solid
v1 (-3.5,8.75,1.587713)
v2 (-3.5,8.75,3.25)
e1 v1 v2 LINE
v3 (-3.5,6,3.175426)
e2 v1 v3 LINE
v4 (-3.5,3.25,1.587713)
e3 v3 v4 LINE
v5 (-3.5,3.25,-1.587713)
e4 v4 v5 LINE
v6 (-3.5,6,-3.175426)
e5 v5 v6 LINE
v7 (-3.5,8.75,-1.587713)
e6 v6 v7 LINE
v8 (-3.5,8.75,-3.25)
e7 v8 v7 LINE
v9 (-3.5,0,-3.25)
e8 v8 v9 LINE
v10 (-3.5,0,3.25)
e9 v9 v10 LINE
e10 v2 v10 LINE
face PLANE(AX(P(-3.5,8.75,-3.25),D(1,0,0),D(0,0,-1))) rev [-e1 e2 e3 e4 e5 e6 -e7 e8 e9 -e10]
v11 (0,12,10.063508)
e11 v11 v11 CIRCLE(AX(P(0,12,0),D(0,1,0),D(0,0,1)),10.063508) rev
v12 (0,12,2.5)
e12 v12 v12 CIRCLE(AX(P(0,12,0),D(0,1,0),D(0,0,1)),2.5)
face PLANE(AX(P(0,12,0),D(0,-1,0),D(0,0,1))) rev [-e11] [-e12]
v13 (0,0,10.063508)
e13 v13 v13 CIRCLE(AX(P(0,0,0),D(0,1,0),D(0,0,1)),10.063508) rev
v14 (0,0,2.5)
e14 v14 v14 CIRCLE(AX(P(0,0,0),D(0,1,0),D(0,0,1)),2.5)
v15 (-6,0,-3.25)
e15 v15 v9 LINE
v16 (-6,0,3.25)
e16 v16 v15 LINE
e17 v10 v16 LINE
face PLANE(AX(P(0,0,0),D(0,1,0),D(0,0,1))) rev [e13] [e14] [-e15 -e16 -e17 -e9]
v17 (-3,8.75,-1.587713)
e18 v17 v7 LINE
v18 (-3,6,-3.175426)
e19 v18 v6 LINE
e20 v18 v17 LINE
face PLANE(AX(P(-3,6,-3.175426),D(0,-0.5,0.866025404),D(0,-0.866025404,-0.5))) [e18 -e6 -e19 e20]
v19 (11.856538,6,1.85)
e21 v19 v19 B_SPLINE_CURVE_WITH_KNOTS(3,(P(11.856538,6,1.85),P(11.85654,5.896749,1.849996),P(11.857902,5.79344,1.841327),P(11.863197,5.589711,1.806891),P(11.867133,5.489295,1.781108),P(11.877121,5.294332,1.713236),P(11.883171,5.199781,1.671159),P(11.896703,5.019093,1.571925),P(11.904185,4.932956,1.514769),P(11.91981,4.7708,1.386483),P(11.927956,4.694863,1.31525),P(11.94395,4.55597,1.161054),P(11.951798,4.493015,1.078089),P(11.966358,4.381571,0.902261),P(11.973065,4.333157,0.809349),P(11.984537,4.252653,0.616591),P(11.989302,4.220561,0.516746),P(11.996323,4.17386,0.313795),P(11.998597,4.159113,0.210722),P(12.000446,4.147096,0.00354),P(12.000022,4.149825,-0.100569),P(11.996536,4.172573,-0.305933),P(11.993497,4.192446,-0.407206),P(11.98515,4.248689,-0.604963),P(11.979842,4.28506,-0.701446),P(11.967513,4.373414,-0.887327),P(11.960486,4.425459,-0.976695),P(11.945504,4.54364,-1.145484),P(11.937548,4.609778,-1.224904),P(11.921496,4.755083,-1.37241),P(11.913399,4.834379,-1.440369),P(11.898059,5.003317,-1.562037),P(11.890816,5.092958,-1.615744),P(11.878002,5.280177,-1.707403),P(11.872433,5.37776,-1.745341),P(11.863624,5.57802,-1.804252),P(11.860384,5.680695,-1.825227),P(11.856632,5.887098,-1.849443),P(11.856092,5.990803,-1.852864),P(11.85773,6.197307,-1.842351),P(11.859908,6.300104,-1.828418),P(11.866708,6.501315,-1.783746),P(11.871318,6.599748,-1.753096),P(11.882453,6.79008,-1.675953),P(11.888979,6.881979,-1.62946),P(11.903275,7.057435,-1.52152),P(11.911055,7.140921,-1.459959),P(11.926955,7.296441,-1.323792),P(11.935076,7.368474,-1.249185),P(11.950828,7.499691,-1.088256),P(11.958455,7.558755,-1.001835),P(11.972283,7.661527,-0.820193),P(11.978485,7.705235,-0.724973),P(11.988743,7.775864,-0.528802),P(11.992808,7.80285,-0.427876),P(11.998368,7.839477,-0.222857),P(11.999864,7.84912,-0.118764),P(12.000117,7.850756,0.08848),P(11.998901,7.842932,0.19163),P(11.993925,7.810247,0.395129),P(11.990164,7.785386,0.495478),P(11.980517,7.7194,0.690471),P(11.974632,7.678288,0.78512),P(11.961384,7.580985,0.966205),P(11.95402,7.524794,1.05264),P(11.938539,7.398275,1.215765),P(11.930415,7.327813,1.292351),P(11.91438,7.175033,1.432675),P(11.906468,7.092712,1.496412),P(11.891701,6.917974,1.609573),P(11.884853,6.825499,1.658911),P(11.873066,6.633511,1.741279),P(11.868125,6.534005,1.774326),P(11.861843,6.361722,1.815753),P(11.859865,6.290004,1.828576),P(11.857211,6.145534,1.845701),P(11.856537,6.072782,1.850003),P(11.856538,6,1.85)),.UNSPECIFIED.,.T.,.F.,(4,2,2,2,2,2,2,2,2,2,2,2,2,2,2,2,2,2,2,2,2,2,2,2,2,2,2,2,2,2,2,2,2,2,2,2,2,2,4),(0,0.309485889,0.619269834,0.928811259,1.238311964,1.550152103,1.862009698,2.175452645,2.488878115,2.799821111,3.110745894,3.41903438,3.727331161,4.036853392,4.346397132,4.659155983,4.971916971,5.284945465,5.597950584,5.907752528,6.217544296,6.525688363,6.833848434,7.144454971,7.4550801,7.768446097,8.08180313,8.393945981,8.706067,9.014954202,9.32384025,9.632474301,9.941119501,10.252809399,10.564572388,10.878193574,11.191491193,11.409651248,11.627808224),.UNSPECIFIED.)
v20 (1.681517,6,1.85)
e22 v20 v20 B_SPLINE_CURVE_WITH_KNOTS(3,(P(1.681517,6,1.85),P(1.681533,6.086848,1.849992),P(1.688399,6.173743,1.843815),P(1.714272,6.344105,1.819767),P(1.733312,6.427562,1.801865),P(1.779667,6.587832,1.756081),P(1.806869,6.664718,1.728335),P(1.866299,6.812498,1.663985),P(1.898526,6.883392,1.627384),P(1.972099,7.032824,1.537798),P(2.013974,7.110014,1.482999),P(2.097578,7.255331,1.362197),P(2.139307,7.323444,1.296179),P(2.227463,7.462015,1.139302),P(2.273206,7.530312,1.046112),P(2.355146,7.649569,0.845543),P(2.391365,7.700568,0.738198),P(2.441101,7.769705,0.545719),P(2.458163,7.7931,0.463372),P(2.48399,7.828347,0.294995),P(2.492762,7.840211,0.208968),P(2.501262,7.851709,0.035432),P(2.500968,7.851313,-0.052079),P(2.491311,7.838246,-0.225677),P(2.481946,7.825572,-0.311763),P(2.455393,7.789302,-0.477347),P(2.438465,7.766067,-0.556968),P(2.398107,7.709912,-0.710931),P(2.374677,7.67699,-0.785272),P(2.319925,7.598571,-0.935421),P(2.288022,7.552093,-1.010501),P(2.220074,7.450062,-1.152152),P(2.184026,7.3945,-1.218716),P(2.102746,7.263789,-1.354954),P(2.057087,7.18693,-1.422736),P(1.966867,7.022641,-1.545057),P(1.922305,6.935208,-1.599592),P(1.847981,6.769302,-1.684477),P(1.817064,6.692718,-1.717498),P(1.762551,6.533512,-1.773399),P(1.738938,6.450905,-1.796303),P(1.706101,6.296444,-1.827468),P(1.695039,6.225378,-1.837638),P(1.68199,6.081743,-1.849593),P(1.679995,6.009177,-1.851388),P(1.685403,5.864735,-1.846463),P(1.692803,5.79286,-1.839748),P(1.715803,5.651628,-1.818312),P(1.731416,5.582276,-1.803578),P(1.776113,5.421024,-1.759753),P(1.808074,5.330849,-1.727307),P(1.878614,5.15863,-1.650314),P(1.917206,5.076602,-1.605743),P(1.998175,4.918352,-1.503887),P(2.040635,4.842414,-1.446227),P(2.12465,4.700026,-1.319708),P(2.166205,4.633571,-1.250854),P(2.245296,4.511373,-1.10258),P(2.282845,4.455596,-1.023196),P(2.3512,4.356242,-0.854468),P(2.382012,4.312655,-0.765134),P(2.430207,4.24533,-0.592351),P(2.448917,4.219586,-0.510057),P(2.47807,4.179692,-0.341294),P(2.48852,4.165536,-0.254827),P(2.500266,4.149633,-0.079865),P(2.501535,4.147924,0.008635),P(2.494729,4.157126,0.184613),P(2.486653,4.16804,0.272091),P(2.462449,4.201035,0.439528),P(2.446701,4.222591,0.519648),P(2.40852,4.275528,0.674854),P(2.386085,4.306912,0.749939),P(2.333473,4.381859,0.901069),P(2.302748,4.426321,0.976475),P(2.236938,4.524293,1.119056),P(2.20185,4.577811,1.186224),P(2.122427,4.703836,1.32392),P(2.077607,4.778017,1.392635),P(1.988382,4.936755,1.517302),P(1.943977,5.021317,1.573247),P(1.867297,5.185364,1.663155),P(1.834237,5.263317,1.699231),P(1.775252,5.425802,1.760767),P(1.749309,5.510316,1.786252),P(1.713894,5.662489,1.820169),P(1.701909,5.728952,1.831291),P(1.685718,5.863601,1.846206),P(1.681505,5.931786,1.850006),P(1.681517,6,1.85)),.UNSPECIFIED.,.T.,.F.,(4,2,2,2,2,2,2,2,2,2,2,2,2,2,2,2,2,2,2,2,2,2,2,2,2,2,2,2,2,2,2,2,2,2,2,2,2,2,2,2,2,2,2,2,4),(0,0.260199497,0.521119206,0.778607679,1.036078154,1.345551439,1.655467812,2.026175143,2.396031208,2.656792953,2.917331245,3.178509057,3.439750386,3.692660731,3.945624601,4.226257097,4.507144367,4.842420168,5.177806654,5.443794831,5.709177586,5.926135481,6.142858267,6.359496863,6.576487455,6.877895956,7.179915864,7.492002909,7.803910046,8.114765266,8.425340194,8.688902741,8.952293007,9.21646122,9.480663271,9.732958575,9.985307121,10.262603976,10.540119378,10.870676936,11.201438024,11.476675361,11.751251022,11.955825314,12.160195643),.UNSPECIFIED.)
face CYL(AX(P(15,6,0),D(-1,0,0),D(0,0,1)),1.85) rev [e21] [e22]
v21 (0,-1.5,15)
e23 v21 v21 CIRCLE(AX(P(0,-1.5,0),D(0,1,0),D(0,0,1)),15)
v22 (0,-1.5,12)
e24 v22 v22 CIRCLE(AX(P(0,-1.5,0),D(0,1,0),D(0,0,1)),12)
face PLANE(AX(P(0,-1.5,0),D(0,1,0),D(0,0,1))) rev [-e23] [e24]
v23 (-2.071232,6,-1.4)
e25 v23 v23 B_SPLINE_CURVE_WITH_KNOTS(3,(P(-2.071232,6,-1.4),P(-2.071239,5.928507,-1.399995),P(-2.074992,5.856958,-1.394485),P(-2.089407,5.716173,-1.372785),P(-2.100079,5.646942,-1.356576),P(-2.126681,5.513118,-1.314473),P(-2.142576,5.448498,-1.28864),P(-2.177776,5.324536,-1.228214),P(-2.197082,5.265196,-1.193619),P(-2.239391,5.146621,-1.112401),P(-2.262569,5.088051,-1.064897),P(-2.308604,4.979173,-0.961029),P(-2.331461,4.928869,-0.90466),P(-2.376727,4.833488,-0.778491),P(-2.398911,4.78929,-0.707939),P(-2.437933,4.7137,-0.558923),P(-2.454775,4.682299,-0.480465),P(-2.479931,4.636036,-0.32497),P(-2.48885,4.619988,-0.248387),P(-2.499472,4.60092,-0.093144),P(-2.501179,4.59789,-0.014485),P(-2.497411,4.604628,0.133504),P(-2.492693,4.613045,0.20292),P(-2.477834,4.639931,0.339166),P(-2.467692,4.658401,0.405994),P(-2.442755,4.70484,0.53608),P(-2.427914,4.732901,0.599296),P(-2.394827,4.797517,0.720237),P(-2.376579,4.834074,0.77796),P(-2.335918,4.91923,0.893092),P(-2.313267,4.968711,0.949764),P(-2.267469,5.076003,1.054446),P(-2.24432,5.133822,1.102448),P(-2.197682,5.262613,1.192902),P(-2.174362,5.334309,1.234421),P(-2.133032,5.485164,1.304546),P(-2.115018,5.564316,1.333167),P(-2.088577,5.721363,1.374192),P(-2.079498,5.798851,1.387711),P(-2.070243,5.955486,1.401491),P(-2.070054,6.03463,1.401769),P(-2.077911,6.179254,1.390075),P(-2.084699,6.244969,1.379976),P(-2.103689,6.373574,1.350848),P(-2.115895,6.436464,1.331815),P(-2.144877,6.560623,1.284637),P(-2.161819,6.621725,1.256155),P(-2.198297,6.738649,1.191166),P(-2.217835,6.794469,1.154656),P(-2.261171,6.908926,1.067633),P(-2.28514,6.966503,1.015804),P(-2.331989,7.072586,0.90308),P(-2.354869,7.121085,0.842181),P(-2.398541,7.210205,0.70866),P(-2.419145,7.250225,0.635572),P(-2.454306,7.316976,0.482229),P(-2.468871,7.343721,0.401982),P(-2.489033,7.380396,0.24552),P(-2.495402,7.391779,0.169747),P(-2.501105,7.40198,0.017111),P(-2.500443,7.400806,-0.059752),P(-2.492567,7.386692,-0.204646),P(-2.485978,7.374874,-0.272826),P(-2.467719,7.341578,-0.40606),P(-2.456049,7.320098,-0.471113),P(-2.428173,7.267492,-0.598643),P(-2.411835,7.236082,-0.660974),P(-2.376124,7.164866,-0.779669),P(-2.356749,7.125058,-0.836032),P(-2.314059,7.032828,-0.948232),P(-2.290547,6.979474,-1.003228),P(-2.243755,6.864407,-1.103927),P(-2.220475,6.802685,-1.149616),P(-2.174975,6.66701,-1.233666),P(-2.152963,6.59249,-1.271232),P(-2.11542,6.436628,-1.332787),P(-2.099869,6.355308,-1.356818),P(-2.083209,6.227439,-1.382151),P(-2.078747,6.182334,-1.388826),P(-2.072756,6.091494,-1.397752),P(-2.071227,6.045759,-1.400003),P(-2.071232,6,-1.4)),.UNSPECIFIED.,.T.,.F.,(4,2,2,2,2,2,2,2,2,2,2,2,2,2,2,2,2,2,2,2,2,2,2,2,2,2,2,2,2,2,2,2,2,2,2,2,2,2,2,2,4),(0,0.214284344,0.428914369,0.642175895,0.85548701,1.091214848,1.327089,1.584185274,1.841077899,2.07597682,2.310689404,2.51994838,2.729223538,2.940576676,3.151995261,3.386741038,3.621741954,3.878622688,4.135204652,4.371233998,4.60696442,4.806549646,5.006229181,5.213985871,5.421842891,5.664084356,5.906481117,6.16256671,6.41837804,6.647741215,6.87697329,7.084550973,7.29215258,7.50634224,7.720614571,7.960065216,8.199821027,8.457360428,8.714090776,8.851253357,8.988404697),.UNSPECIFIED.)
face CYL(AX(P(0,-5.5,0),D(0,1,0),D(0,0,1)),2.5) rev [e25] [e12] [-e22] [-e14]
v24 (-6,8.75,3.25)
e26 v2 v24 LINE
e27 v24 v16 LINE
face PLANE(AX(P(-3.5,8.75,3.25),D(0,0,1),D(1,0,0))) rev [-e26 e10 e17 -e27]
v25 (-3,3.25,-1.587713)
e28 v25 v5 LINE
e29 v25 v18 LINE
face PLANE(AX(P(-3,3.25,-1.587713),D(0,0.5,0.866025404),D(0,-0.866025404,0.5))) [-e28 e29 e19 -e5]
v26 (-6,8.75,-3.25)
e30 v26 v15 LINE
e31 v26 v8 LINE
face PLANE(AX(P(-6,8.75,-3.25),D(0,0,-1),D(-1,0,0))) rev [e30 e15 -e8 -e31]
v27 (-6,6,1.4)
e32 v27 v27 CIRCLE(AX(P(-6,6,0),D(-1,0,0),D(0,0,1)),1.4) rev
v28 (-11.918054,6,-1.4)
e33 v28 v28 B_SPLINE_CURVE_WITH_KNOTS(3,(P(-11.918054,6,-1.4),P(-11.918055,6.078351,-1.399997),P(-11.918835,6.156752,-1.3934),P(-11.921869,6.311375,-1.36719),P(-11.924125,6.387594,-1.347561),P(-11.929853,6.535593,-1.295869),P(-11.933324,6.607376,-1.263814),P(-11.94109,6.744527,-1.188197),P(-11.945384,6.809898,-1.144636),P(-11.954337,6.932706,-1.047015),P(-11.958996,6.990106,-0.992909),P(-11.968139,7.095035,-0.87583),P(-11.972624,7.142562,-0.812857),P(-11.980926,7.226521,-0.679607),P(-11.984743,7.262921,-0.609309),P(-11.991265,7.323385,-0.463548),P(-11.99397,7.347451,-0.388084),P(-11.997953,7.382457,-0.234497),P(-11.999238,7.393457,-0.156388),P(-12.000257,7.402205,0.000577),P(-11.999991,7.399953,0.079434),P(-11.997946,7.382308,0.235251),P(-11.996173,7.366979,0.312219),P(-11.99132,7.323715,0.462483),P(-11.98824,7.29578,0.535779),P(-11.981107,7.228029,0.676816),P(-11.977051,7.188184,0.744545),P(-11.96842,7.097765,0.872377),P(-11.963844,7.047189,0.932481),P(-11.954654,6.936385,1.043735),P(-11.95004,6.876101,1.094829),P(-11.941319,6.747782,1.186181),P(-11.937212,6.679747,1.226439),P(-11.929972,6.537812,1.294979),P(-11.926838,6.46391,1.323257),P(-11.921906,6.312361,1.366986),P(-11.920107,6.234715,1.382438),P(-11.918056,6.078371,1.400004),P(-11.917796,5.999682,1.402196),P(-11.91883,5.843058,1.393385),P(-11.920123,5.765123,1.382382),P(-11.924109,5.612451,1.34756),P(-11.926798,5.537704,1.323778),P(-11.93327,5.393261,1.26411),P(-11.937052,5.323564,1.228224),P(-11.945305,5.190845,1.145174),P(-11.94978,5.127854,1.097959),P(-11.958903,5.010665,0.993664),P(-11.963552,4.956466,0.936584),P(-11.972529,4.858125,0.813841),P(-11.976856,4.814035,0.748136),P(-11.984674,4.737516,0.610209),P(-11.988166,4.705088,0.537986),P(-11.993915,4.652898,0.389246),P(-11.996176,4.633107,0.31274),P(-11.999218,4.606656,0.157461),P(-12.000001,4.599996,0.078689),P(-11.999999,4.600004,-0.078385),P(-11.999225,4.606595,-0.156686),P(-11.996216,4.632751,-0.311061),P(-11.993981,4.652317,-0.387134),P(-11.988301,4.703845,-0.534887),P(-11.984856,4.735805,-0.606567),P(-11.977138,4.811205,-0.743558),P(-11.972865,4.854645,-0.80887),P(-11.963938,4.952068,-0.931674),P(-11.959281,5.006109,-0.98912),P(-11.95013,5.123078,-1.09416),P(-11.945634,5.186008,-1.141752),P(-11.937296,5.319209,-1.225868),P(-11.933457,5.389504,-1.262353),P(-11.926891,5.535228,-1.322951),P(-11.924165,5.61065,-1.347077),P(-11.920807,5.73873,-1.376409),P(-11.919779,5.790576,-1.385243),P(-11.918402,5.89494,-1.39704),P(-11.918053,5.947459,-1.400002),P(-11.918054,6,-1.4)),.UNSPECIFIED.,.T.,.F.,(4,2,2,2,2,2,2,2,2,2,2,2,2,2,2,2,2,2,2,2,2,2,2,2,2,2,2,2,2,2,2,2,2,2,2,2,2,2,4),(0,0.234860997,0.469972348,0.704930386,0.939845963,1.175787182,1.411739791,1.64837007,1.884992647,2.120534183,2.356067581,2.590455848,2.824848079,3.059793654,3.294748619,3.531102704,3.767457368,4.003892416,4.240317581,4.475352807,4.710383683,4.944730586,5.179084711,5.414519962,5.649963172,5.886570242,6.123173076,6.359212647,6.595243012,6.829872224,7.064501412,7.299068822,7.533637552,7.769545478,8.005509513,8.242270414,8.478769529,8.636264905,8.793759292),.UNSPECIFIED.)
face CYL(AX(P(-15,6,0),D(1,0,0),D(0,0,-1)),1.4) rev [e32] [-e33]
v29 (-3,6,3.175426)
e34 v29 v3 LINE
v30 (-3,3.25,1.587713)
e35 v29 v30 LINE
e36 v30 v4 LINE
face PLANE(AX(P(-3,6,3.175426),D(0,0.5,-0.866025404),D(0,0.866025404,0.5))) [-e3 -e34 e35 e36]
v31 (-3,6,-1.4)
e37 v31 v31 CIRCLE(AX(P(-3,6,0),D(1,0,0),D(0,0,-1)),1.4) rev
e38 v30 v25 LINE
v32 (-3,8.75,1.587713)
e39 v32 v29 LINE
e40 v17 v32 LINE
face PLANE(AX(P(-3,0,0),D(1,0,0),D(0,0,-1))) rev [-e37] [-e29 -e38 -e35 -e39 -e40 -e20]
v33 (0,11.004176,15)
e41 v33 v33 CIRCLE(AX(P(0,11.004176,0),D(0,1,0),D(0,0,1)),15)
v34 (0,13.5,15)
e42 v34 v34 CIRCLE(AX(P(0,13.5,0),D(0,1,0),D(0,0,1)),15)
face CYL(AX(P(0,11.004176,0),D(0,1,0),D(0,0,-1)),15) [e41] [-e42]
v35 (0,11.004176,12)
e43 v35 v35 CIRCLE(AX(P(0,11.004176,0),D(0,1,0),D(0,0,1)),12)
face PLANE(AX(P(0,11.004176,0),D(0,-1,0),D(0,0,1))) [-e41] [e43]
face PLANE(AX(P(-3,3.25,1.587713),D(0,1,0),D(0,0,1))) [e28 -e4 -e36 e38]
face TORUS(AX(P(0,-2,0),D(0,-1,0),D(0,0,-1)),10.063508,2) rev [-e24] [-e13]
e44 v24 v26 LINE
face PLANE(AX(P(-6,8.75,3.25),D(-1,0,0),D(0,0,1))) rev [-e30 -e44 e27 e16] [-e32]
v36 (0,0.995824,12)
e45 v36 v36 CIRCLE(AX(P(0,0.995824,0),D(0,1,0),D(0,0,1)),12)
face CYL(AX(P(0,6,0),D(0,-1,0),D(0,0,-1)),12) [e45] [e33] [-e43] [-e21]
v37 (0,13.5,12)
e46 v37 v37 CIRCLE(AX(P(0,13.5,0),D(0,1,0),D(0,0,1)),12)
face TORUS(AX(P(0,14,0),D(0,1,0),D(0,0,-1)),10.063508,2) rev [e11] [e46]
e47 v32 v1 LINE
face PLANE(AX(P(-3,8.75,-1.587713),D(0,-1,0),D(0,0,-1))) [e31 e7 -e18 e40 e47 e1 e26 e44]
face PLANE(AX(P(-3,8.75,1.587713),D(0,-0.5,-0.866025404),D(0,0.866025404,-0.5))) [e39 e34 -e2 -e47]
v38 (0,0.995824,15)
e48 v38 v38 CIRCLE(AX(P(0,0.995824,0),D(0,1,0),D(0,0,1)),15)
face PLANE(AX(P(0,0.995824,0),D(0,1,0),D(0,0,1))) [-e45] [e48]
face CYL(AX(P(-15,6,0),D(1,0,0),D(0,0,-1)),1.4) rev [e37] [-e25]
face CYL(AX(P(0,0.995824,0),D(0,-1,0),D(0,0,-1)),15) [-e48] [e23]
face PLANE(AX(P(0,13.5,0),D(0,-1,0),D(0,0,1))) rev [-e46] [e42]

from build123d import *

# Parameters (mm, degrees)
BOSS_EXTRUDE6_DEPTH      = 6
BOSS_EXTRUDE7_DEPTH      = 0.995824486
BOSS_EXTRUDE7_DEPTH_BACK = 1.5
FILLET17_R               = 2
SKETCH4_R                = 2.5
CUT_EXTRUDE2_DEPTH       = 11.5
SKETCH11_R               = 1.4
CUT_EXTRUDE3_DEPTH       = 15
CUT_EXTRUDE10_DEPTH      = 0.5
CUT_EXTRUDE10_DEPTH_BACK = 2
SKETCH14_W               = 2.5
SKETCH14_H               = 6.5
CUT_EXTRUDE15_DEPTH      = 8.75
SKETCH16_R               = 1.85
CUT_EXTRUDE16_DEPTH      = 15


with BuildPart() as part:
    # Sketch1 → Boss-Extrude6 (new body)
    with BuildSketch(Plane(origin=(0, 0, 0), x_dir=(1, 0, 0), z_dir=(0, 1, 0))):
        with BuildLine():
            ThreePointArc((12, 0), (8.485281374, 8.485281374), (0, 12))
            ThreePointArc((0, 12), (-8.485281374, 8.485281374), (-12, 0))
            ThreePointArc((-12, 0), (-8.485281374, -8.485281374), (0, -12))
            ThreePointArc((0, -12), (8.485281374, -8.485281374), (12, 0))
        make_face()
    extrude(amount=BOSS_EXTRUDE6_DEPTH)

    # Sketch1<11> → Boss-Extrude7 (add, two sides: drawn at the far end of the back side and taken through both)
    with BuildSketch(Plane(origin=(0, 0, 0), x_dir=(1, 0, 0), z_dir=(0, 1, 0)).offset(-BOSS_EXTRUDE7_DEPTH_BACK)):
        with BuildLine():
            ThreePointArc((15, 0), (10.606601718, 10.606601718), (0, 15))
            ThreePointArc((0, 15), (-10.606601718, 10.606601718), (-15, 0))
            ThreePointArc((-15, 0), (-10.606601718, -10.606601718), (0, -15))
            ThreePointArc((0, -15), (10.606601718, -10.606601718), (15, 0))
        make_face()
        with BuildLine():
            ThreePointArc((12, 0), (8.485281374, 8.485281374), (0, 12))
            ThreePointArc((0, 12), (-8.485281374, 8.485281374), (-12, 0))
            ThreePointArc((-12, 0), (-8.485281374, -8.485281374), (0, -12))
            ThreePointArc((0, -12), (8.485281374, -8.485281374), (12, 0))
        make_face(mode=Mode.SUBTRACT)
    extrude(amount=BOSS_EXTRUDE7_DEPTH + BOSS_EXTRUDE7_DEPTH_BACK)


with BuildPart() as boss_extrude7_kept_piece:
    # of the separate pieces the step leaves, the one the design keeps (boss_extrude7_pieces_kept)
    add(part.part.solids().sort_by_distance((12, 6, 0))[0])

    # Fillet17
    # the kernel refuses this fillet: 2 mm, written as the material it adds along each edge
    with BuildSketch(Plane(origin=(0, 0, 0), x_dir=(1, 0, 0), z_dir=(0, 0, 1))) as fillet17_piece_1:
        with BuildLine():
            CenterArc((10.063508327, -2), FILLET17_R, 14.477512186, 75.522487814)
            Line((10.063508327, 0), (10.063508327, 0.04))
            Line((10.063508327, 0.04), (12, 0.04))
            Line((12, 0.04), (12.04, 0))
            ThreePointArc((12.04, 0), (12.04, -0.75), (12.038729833, -1.49))
            Line((12.038729833, -1.49), (12, -1.5))
        make_face()
    revolve(axis=Axis((0, 0, 0), (0, 1, 0)))

    # Sketch4 → Cut-Extrude2 (cut)
    with BuildSketch(Plane(origin=(0, 6, 0), x_dir=(1, 0, 0), z_dir=(0, 1, 0))):
        with Locations(Location((0, 0, 0), (0, 0, 270))):
            Circle(SKETCH4_R)
    extrude(amount=-CUT_EXTRUDE2_DEPTH, mode=Mode.SUBTRACT)

    # Mirror6: Boss-Extrude7 kept piece across plane


with BuildPart() as boss_extrude7_kept_piece_1:
    add(boss_extrude7_kept_piece.part)
    add(boss_extrude7_kept_piece.part.mirror(Plane.ZX.offset(6)))

    # Sketch11 → Cut-Extrude3 (cut)
    with BuildSketch(Plane(origin=(0, 0, 0), x_dir=(0, 0, -1), z_dir=(1, 0, 0))):
        with Locations((0, 6)):
            Circle(SKETCH11_R)
    extrude(amount=-CUT_EXTRUDE3_DEPTH, mode=Mode.SUBTRACT)

    # Sketch12 → Cut-Extrude10 (cut, two sides: drawn at the far end of the back side and taken through both)
    with BuildSketch(Plane(origin=(-3.5, 0, 0), x_dir=(0, 0, -1), z_dir=(1, 0, 0)).offset(-CUT_EXTRUDE10_DEPTH_BACK)):
        Polygon((3.175426481, 6), (1.58771324, 8.75), (-1.58771324, 8.75), (-3.175426481, 6), (-1.58771324, 3.25), (1.58771324, 3.25), align=None)
    extrude(amount=CUT_EXTRUDE10_DEPTH + CUT_EXTRUDE10_DEPTH_BACK, mode=Mode.SUBTRACT)

    # Sketch14 → Cut-Extrude15 (cut)
    with BuildSketch(Plane.XZ):
        with Locations((-4.75, 0)):
            Rectangle(SKETCH14_W, SKETCH14_H)
    extrude(amount=-CUT_EXTRUDE15_DEPTH, mode=Mode.SUBTRACT)

    # Sketch16 → Cut-Extrude16 (cut)
    with BuildSketch(Plane(origin=(0, 0, 0), x_dir=(0, 0, -1), z_dir=(1, 0, 0))):
        with Locations(Location((0, 6, 0), (0, 0, 180))):
            Circle(SKETCH16_R)
    extrude(amount=CUT_EXTRUDE16_DEPTH, mode=Mode.SUBTRACT)


solid = boss_extrude7_kept_piece_1.part
